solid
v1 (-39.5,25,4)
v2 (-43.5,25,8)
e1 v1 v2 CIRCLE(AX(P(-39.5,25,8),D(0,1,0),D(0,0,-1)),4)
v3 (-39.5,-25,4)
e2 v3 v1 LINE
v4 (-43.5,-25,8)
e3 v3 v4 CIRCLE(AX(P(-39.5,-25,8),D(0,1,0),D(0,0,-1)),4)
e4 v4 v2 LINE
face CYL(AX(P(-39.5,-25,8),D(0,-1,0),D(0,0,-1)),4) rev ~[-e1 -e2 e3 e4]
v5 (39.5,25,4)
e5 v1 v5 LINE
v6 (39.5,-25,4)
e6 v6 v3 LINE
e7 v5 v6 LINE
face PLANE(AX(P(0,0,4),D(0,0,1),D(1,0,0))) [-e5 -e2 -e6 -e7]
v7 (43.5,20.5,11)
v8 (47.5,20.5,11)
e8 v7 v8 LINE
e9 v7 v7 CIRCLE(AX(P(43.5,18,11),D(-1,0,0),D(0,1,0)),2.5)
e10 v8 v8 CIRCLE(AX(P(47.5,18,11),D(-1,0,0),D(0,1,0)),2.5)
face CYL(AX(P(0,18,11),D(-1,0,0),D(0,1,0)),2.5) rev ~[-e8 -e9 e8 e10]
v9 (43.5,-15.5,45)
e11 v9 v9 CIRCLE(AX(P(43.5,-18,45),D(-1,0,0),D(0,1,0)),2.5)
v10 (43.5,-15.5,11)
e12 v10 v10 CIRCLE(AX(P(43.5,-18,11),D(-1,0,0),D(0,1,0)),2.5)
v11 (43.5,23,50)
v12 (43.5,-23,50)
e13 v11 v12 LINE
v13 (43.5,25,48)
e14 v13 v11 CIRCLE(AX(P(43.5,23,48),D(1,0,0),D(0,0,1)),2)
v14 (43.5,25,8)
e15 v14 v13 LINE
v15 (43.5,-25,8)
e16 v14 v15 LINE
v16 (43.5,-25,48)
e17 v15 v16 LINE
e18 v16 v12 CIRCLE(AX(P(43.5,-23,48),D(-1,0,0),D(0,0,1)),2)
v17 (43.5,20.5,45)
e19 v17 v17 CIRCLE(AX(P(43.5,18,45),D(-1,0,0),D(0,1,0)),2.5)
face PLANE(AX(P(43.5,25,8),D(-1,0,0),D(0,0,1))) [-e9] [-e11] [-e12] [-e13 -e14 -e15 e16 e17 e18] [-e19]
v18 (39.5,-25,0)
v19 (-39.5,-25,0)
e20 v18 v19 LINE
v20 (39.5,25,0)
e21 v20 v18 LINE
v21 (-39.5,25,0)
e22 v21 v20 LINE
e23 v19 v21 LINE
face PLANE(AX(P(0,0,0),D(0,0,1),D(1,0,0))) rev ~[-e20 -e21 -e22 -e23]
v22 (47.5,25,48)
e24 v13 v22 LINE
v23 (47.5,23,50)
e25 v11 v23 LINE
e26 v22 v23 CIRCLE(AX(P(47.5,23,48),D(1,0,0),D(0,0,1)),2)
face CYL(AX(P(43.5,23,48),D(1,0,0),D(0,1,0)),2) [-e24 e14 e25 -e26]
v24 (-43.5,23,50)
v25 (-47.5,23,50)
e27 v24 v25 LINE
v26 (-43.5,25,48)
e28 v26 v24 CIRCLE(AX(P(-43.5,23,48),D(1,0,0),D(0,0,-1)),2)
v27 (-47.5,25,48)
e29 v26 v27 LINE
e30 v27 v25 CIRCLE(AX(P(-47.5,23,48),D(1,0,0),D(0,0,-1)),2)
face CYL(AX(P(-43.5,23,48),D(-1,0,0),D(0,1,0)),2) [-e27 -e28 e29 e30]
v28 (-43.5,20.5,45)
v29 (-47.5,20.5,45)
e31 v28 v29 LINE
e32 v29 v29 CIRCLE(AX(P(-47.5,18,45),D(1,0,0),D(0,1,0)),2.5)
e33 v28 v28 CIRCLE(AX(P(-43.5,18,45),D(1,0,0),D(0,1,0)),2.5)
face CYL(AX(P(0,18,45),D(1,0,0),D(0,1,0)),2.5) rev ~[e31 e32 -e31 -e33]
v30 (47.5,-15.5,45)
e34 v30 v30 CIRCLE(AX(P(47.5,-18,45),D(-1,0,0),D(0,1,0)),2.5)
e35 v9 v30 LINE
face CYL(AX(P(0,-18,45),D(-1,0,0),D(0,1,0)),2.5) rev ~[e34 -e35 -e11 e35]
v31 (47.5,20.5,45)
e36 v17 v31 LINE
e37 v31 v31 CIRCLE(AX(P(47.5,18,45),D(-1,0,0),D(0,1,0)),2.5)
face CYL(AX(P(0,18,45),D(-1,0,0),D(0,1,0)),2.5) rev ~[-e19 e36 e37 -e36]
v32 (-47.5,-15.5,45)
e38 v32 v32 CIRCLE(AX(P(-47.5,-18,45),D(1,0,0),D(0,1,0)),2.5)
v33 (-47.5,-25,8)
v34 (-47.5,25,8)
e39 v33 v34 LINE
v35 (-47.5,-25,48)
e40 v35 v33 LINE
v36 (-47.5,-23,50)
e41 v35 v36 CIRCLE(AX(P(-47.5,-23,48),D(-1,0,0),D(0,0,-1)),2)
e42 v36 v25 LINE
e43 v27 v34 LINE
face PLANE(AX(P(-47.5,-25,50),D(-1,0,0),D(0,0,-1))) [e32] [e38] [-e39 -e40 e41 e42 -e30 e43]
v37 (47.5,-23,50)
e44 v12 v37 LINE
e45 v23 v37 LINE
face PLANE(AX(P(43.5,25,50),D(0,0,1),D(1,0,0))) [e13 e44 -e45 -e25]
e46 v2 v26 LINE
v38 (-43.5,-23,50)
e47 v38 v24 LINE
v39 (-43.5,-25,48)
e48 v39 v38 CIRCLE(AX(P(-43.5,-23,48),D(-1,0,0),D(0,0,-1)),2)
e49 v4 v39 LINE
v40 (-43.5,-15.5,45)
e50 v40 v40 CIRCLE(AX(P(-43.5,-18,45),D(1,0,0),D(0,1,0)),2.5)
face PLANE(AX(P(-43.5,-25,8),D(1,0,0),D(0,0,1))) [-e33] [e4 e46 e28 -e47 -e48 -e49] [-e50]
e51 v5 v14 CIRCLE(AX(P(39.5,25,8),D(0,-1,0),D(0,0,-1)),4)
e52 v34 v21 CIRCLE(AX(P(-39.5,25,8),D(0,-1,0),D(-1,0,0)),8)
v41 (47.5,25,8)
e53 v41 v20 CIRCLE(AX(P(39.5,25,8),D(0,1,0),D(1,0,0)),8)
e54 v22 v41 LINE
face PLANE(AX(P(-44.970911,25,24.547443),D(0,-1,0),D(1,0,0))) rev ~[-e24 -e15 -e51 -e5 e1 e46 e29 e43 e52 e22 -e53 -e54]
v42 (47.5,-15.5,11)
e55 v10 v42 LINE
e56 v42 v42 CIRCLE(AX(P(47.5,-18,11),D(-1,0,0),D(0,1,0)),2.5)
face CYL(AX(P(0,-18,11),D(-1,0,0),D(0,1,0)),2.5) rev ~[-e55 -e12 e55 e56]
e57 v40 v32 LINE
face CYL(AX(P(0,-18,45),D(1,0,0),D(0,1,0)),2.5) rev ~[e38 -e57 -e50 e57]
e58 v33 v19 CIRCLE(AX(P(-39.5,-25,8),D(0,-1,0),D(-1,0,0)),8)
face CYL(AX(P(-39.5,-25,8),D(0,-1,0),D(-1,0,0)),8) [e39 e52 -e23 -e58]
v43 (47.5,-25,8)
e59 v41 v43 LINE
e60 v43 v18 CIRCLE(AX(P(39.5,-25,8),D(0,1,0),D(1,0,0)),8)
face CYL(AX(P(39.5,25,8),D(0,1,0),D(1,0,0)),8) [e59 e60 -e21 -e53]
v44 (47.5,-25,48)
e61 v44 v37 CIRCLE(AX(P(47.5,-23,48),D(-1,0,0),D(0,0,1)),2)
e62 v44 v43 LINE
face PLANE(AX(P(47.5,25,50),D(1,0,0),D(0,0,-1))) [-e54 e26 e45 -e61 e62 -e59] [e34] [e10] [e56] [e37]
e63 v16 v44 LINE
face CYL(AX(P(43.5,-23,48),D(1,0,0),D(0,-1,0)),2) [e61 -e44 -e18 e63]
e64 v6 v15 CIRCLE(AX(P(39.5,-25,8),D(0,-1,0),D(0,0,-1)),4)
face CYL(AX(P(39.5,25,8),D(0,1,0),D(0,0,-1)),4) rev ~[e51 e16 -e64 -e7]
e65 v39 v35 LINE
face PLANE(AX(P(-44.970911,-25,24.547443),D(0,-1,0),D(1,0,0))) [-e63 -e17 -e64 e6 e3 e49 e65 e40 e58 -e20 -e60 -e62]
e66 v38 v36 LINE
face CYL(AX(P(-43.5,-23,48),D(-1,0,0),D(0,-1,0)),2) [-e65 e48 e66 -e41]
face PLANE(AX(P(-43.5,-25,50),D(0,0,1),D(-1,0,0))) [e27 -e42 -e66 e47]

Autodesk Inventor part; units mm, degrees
ref_plane "YZ Plane" through (0, 0, 0) normal (1, 0, 0) x (0, 1, 0)
ref_plane "XZ Plane" through (0, 0, 0) normal (0, 1, 0) x (-1, 0, 0)
ref_plane "XY Plane" through (0, 0, 0) normal (0, 0, 1) x (1, 0, 0)
sketch "Sketch1" plane through (0, 0, 0) normal (0, 0, 1) x (1, 0, 0)
  line L0 (-47.5, 25) -> (47.5, 25)
  line L1 (47.5, 25) -> (47.5, -25)
  line L2 (47.5, -25) -> (-47.5, -25)
  line L3 (-47.5, -25) -> (-47.5, 25)
  line L4 (-47.5, 25) -> (47.5, -25) construction
  line L5 (47.5, 25) -> (-47.5, -25) construction
  point P0 (0, 0)
  dimension "d0" = 50
  dimension "d20" = 95
extrude "Plate1" add sketch "Sketch1" along normal blind 4
sketch "Sketch2" plane through (-43.5, -25, 0) normal (-1, 0, 0) x (0, -1, 0)
  line L0 (-50, 0) -> (0, 0)
  line L1 (0, 0) -> (0, 50)
  line L2 (0, 50) -> (-50, 50)
  line L3 (-50, 50) -> (-50, 0)
edge flange "Flange1" height 50 angle 90 thickness 4 bend radius 4 thickness toward (-1, 0, 0) relief tear relief width 4 relief depth 2 corner gap 4 corner form 0 edges at (-47.5, 0, 4) (47.5, 0, 4) wall of the first edge with corners at (-43.5, 25, 0) (-43.5, -25, 0) (-43.5, -25, 50) (-43.5, 25, 50)
bend "Bend1"
corner "Corner1"
sketch "Sketch3" plane through (0, 0, 0) normal (1, 0, 0) x (0, 1, 0)
  line L0 (25, 8) -> (25, 50) projected
  line L1 (25, 50) -> (-25, 50) projected
  line L2 (-25, 50) -> (-25, 8) projected
  line L3 (-18, 11) -> (18, 11) construction
  line L4 (18, 11) -> (18, 45) construction
  line L5 (18, 45) -> (-18, 45) construction
  line L6 (-18, 45) -> (-18, 11) construction
  line L7 (-18, 11) -> (18, 45) construction
  line L8 (18, 11) -> (-18, 45) construction
  circle A0 centre (18, 45) radius 2.5
  circle A1 centre (-18, 45) radius 2.5
  circle A2 centre (-18, 11) radius 2.5
  circle A3 centre (18, 11) radius 2.5
  point P0 (0, 0)
  point P1 (0, 28)
  dimension "d12" = 5
  dimension "d13" = 7
  dimension "d14" = 7
  dimension "d15" = 34
  dimension "d16" = 5
extrude "Extrusion1" cut sketch "Sketch3" along normal through all both and the other way through all contours A0 | A1
fillet "Fillet1" radius 2 4 edges at (-45.5, 25, 50) (-45.5, -25, 50) (45.5, 25, 50) (45.5, -25, 50)
extrude "Extrusion2" cut sketch "Sketch3" along normal through all contours A2 | A3
equation "\"d14\" = d13"
equation "\"d2\" = BendReliefWidth"
equation "\"d3\" = BendReliefDepth"
equation "\"d4\" = MinimumRemnant"
equation "\"d5\" = BendRadius"
equation "\"d8\" = BendRadius"
equation "\"d9\" = CornerReliefSize"
equation "\"d10\" = GapSize"
equation "\"d11\" = JacobiRadiusSize"
equation "\"BendRadius\" = Thickness"
equation "\"BendReliefWidth\" = Thickness"
equation "\"BendReliefDepth\" = 0.5 * Thickness"
equation "\"CornerReliefSize\" = 4 * Thickness"
equation "\"MinimumRemnant\" = 2 * Thickness"
equation "\"TransitionRadius\" = BendRadius"
equation "\"JacobiRadiusSize\" = BendRadius"
equation "\"GapSize\" = Thickness"
equation "\"d1\" = BendRadius"
equation "\"Thickness\" = 4"
properties part number "coluna-apoio" material "Aluminum 6061"
